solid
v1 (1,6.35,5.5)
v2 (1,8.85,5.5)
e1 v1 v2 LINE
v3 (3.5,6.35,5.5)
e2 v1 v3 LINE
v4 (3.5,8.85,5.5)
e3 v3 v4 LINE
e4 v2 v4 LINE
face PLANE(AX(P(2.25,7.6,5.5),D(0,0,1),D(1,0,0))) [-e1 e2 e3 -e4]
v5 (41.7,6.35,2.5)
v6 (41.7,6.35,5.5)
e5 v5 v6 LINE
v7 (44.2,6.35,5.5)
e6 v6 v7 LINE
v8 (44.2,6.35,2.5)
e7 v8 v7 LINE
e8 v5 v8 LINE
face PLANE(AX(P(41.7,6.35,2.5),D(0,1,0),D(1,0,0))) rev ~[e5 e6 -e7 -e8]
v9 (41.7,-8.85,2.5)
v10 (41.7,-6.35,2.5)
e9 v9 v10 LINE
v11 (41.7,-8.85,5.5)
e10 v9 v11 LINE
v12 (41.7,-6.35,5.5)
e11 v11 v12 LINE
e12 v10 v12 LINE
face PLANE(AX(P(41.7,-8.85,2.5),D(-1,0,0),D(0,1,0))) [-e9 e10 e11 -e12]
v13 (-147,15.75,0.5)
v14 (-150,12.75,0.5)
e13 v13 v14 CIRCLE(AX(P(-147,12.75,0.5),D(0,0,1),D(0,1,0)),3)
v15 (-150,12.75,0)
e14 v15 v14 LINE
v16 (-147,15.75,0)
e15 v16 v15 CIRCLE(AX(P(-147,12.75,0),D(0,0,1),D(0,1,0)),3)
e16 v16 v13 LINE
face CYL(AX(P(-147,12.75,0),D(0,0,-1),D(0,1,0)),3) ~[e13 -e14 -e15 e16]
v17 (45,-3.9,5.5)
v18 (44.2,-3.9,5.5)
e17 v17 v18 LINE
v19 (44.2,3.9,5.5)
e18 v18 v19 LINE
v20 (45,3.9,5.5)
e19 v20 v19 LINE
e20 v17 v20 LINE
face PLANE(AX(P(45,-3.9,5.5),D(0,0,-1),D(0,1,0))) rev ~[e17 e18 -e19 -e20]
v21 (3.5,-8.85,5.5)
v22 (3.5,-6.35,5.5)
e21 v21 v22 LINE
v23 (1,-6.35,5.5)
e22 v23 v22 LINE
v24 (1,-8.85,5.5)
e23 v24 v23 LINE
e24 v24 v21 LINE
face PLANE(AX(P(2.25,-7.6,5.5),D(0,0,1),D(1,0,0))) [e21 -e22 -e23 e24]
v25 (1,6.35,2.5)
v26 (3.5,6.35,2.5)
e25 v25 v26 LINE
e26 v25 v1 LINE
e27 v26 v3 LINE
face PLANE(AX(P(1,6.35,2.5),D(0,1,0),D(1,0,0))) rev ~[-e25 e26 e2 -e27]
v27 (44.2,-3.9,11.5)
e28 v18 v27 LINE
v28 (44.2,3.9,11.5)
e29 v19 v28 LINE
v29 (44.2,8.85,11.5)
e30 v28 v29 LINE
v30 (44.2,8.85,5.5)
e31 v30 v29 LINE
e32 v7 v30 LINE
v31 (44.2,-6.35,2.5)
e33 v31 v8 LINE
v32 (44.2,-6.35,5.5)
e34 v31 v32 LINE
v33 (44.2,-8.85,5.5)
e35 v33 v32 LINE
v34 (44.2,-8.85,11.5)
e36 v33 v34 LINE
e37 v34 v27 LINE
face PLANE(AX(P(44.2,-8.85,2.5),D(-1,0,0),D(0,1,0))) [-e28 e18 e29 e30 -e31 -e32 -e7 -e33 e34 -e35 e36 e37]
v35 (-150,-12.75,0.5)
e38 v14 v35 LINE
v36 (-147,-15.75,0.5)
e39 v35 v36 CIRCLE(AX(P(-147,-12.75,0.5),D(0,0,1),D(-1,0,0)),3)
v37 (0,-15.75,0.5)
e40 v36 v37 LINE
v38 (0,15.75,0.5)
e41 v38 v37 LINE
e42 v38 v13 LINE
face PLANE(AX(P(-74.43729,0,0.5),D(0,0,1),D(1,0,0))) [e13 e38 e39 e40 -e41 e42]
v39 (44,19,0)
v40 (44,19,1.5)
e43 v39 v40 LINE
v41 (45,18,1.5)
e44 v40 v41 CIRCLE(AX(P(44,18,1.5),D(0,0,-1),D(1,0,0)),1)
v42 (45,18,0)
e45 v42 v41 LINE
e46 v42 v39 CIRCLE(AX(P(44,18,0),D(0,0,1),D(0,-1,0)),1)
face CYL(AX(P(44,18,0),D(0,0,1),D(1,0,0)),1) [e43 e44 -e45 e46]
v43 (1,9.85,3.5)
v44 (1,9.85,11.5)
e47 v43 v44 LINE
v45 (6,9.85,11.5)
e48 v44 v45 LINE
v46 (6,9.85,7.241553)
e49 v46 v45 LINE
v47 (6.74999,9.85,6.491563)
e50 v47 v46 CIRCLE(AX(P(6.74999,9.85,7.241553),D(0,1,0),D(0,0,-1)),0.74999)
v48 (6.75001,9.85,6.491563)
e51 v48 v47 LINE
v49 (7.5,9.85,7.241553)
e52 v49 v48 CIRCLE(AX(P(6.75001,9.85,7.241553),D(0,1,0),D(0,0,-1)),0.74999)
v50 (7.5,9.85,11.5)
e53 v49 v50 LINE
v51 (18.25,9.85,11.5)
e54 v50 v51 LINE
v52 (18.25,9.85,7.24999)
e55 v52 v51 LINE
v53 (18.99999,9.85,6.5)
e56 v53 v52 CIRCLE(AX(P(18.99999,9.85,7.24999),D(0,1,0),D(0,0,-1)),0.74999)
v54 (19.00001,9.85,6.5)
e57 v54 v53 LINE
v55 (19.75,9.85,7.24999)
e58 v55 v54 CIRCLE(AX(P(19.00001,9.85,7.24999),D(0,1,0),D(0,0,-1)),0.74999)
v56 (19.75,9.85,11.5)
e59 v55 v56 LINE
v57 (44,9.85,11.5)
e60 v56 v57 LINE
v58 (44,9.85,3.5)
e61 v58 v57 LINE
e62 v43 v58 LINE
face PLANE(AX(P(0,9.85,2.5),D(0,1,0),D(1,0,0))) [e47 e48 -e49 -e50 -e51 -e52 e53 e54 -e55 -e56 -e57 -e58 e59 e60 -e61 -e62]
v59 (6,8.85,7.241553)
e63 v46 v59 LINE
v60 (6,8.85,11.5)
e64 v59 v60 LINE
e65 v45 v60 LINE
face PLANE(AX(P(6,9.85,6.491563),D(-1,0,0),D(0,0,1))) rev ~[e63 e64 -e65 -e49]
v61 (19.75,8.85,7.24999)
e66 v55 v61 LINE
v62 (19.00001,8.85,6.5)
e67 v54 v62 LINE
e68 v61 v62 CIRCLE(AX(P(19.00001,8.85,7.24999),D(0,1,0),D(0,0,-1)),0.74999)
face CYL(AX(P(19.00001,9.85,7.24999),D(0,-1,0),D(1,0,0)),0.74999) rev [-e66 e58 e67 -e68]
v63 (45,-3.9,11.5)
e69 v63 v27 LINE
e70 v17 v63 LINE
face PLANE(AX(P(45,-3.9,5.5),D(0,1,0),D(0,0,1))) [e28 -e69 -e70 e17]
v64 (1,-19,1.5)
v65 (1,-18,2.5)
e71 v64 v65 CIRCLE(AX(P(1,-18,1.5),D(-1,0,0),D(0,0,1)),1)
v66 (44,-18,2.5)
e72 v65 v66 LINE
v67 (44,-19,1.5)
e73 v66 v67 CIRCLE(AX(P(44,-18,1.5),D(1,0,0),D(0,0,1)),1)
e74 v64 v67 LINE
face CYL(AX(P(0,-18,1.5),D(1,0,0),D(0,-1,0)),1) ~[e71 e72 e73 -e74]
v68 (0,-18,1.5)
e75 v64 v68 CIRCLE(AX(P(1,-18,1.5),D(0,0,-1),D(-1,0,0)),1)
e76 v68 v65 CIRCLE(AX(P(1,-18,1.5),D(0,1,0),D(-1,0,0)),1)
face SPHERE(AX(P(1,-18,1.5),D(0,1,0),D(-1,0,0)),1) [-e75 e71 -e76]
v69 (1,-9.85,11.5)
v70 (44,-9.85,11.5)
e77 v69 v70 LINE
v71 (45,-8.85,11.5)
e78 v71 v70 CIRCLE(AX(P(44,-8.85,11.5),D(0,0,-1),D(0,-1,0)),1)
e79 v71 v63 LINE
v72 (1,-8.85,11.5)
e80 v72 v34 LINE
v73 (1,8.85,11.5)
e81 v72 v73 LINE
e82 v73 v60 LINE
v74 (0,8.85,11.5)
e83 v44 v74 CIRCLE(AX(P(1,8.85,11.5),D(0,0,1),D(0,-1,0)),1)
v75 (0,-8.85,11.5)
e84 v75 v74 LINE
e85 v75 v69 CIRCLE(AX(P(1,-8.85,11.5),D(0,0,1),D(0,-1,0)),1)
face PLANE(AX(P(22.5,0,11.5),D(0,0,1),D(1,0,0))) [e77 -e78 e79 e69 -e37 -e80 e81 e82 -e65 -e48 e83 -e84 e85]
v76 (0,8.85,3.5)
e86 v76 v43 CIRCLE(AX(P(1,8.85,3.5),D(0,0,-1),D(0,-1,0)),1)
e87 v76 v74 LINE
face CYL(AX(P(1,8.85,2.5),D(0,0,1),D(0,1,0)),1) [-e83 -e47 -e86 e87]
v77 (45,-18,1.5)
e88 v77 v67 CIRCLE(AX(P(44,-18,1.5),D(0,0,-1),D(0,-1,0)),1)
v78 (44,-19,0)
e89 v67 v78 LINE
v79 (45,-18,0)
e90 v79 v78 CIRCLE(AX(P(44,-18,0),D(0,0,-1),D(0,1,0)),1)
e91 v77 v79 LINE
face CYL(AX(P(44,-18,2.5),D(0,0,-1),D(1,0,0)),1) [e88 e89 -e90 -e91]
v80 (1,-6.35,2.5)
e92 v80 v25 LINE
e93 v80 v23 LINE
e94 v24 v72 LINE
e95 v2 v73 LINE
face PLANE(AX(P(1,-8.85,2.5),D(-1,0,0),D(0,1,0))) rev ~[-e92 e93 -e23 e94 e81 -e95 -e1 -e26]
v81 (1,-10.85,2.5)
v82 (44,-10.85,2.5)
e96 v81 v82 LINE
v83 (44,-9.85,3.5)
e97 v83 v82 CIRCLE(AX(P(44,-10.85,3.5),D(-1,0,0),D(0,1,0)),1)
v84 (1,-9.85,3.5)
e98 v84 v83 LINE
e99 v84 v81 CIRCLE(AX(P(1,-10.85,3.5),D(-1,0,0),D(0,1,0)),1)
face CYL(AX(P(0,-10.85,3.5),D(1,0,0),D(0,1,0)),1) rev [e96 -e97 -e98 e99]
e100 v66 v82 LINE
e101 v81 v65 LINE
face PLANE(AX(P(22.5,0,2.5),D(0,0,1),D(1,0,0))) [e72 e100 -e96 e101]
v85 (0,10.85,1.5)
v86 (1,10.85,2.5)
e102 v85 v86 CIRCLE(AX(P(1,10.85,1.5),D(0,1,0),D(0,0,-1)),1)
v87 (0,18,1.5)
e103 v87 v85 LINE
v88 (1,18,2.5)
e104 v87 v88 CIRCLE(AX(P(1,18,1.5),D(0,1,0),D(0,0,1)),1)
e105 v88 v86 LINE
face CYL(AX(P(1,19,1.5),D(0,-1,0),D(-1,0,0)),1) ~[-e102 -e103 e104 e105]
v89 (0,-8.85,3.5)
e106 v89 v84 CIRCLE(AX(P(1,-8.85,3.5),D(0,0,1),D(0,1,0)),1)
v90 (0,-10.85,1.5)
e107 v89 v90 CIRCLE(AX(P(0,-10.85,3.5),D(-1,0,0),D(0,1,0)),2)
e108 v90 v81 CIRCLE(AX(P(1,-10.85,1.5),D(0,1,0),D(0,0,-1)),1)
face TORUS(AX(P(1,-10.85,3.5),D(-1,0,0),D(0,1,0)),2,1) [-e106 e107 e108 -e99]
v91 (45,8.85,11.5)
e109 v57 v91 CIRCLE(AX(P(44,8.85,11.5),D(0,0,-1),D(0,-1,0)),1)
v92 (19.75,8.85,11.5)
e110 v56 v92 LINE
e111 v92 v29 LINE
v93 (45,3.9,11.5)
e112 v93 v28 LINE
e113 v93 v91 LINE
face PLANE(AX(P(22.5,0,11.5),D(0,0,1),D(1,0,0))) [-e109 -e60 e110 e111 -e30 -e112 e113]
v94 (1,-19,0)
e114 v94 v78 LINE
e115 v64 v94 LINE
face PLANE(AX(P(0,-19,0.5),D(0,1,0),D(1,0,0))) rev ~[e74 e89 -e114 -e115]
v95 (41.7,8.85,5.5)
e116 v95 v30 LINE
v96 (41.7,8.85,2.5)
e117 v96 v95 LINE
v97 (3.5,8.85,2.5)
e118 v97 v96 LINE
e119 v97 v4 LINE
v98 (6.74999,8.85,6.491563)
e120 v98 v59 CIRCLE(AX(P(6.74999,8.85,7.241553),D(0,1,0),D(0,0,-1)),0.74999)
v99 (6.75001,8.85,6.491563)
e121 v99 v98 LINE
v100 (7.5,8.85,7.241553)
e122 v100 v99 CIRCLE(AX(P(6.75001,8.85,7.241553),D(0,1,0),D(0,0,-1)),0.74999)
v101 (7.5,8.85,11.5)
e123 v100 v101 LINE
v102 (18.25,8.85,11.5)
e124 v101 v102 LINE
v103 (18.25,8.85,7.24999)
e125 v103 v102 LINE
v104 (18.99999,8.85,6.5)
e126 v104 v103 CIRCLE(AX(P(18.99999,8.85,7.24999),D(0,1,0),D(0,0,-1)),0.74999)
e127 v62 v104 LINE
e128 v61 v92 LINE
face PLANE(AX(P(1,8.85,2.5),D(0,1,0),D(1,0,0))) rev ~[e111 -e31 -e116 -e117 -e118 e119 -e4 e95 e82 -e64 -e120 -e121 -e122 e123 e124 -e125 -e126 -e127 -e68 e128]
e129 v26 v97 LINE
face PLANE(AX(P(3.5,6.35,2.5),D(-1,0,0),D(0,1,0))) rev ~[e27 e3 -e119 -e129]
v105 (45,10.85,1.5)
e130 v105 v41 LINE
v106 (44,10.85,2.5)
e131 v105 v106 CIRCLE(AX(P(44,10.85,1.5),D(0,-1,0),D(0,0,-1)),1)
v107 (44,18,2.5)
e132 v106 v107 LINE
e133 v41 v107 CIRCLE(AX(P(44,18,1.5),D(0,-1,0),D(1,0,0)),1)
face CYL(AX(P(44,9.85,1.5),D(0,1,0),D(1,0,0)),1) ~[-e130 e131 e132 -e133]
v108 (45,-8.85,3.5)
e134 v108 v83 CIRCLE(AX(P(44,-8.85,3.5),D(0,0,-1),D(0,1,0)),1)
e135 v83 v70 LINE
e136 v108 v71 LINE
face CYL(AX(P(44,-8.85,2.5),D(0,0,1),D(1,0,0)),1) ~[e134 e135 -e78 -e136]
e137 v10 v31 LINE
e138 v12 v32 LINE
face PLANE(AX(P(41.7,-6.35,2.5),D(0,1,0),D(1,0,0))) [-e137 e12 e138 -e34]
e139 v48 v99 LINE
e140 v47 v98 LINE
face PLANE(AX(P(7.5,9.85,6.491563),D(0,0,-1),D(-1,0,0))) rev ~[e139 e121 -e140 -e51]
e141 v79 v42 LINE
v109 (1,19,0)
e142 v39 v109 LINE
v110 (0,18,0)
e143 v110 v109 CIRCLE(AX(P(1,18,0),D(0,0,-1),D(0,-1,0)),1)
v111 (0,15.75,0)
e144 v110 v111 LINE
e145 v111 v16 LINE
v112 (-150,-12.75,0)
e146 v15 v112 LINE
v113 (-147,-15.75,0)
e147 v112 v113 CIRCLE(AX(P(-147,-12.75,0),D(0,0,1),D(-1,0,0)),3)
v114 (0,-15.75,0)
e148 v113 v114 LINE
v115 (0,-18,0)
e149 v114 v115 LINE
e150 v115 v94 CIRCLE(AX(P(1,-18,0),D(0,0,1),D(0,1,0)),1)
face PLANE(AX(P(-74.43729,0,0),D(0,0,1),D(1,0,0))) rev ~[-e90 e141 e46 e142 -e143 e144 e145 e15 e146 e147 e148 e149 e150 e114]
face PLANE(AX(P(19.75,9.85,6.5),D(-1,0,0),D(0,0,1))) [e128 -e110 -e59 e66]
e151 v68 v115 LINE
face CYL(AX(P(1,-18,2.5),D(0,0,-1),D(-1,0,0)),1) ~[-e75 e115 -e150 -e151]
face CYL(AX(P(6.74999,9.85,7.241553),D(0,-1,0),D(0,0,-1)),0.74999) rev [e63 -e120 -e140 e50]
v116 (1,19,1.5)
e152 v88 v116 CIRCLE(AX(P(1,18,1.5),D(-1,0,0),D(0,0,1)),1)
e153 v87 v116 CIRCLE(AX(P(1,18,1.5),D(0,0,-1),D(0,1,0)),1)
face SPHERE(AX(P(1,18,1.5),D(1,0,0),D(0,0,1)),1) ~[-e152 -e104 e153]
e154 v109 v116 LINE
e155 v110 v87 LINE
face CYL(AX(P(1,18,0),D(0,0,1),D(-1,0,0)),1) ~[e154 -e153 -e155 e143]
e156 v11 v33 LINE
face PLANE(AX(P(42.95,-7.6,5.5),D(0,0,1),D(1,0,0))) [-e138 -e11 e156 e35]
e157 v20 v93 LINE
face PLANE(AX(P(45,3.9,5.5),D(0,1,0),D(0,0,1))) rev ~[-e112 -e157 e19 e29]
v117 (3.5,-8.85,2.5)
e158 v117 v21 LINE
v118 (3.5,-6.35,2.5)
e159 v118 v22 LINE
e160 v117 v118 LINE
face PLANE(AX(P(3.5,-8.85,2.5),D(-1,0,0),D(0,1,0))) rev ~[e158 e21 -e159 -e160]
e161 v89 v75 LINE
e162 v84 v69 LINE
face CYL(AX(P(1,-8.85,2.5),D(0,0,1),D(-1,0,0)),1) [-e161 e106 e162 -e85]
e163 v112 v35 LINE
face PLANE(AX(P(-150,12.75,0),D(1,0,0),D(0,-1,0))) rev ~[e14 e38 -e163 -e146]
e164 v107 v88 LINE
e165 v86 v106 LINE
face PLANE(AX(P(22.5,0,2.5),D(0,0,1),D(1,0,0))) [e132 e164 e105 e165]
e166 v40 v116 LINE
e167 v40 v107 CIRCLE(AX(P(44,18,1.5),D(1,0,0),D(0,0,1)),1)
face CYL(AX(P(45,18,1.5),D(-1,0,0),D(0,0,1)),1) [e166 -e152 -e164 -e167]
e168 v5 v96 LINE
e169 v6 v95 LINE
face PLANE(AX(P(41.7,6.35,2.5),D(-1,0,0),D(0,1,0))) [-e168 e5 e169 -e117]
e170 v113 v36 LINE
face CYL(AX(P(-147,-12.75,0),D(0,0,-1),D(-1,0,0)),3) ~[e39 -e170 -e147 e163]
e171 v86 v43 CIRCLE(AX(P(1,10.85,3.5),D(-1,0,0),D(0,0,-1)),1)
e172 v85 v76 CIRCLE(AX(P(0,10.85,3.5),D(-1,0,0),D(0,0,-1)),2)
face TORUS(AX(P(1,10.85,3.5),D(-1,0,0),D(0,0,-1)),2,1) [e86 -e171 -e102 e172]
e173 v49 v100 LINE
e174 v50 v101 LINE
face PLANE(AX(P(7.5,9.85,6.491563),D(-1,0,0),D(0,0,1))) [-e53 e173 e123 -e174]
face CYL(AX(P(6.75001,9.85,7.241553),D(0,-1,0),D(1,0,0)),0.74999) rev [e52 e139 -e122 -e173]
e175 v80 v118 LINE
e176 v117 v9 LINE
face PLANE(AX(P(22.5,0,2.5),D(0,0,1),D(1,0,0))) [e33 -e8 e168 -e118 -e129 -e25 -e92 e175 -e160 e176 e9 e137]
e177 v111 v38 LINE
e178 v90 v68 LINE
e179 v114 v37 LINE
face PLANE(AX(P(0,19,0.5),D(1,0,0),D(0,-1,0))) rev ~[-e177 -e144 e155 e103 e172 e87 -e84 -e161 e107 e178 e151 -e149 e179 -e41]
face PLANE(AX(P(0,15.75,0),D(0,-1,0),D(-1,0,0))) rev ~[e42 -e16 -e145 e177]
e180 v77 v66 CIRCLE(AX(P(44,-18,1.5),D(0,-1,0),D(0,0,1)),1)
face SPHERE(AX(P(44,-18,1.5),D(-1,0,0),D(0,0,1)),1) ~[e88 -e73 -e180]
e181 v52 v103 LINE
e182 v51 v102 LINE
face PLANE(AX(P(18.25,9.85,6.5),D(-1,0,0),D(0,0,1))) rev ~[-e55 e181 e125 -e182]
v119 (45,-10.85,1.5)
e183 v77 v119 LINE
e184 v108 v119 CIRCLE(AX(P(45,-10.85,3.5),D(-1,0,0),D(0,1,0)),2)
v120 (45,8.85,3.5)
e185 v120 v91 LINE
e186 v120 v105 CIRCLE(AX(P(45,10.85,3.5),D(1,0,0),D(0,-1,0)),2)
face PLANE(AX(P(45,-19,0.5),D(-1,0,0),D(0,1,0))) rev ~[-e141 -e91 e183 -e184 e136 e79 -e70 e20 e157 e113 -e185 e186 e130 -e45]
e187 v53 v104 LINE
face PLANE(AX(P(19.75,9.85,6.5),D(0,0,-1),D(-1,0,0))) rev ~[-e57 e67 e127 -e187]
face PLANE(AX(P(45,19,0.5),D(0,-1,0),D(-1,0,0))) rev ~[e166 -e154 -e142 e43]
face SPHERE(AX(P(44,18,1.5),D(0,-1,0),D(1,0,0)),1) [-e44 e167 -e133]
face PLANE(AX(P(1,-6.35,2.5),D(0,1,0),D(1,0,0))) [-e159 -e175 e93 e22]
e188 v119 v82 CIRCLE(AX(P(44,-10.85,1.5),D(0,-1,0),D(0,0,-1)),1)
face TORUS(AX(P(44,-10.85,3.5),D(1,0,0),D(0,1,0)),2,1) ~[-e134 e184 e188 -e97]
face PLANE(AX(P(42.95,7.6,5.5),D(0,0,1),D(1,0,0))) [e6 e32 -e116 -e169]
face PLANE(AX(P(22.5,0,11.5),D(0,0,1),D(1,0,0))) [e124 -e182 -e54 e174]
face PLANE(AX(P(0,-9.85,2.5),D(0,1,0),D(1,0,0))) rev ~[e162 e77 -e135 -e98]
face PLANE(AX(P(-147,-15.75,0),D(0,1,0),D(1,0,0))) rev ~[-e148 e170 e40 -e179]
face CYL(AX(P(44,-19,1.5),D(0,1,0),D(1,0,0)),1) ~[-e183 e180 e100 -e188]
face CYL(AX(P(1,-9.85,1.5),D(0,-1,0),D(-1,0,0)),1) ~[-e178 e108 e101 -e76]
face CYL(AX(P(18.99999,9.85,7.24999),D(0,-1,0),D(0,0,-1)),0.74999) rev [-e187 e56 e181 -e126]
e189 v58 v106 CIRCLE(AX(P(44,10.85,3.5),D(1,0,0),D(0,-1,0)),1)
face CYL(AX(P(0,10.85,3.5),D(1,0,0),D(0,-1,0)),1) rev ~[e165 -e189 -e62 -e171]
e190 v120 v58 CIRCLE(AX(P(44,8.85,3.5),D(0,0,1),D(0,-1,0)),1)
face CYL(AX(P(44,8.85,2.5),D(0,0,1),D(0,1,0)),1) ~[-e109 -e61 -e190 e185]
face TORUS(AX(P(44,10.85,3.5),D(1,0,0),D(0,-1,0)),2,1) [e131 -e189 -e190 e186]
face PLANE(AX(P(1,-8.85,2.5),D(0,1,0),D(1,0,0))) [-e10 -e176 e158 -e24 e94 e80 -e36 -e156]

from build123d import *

# Parameters (mm, degrees)
F1_DEPTH  = 0.5
F3_DEPTH  = 2
F4_W      = 45
F4_H      = 19.7
F4_W_2    = 43.2
F4_H_2    = 17.7
F5_DEPTH  = 9
F6_W      = 2.5
F6_H      = 2.5
F7_DEPTH  = 3
F8_W      = 7.8
F8_H      = 6
F9_DEPTH  = 0.8
F10_W     = 1.5
F10_H     = 5
F10_H_2   = 5.0084371828
F11_DEPTH = 1
F12_R     = 0.74999
F13_R     = 1


# Not quite as in the source:
# - a fillet or chamfer is up to 0.001 mm smaller than in the source, because OpenCascade refuses the exact size


with BuildPart() as f1:
    # F0 (on Top) → F1 (new body)
    with BuildSketch(Plane.XY):
        with BuildLine():
            Line((0, -15.75), (0, 15.75))
            Line((0, 15.75), (-147, 15.75))
            ThreePointArc((-147, 15.75), (-149.1213203436, 14.8713203436), (-150, 12.75))
            Line((-150, 12.75), (-150, -12.75))
            ThreePointArc((-150, -12.75), (-149.1213203436, -14.8713203436), (-147, -15.75))
            Line((-147, -15.75), (0, -15.75))
        make_face()
        Polygon((45, 19), (0, 19), (0, 15.75), (0, -15.75), (0, -19), (45, -19), align=None)
    extrude(amount=F1_DEPTH)

    # F2 (on face) → F3 (join)
    with BuildSketch(Plane.XY.offset(0.5)):
        Polygon((45, -19), (45, 19), (0, 19), (0, 15.75), (0, -15.75), (0, -19), align=None)
    extrude(amount=F3_DEPTH)

    # F4 (on face) → F5 (join)
    with BuildSketch(Plane.XY.offset(2.5)):
        with Locations((22.5, 0)):
            Rectangle(F4_W, F4_H)
        with Locations((22.6, 0)):
            Rectangle(F4_W_2, F4_H_2, mode=Mode.SUBTRACT)
    extrude(amount=F5_DEPTH)

    # F6 (on face) → F7 (join)
    with BuildSketch(Plane.XY.offset(2.5)):
        with Locations((2.25, 7.6)):
            Rectangle(F6_W, F6_H)
        with Locations((42.95, 7.6)):
            Rectangle(F6_W, F6_H)
        with Locations((42.95, -7.6)):
            Rectangle(F6_W, F6_H)
        with Locations((2.25, -7.6)):
            Rectangle(F6_W, F6_H)
    extrude(amount=F7_DEPTH)

    # F8 (on face) → F9 (cut, through all)
    with BuildSketch(Plane.YZ.offset(45)):
        with Locations((0, 8.5)):
            Rectangle(F8_W, F8_H)
    extrude(amount=-F9_DEPTH, mode=Mode.SUBTRACT)

    # F10 (on face) → F11 (cut, through all)
    with BuildSketch(Plane(origin=(0, 9.85, 0), x_dir=(-1, 0, 0), z_dir=(0, 1, 0))):
        with Locations((-19, 9)):
            Rectangle(F10_W, F10_H)
        with Locations((-6.75, 8.9957814086)):
            Rectangle(F10_W, F10_H_2)
    extrude(amount=-F11_DEPTH, mode=Mode.SUBTRACT)

    # F12 (radius 0.75 in the source; OpenCascade refuses exactly that, so slightly less here)
    f12_edges = [f1.edges().sort_by_distance(p)[0] for p in [
        (18.25, 9.35, 6.5),
        (19.75, 9.35, 6.5),
        (6, 9.35, 6.491563),
        (7.5, 9.35, 6.491563),
    ]]
    fillet(f12_edges, radius=F12_R)

    # F13
    f13_edges = [f1.edges().sort_by_distance(p)[0] for p in [
        (45, 9.85, 7),
        (45, 14.425, 2.5),
        (45, 19, 1.25),
        (22.5, 19, 2.5),
        (0, 14.425, 2.5),
        (0, 9.85, 7),
        (22.5, 9.85, 2.5),
        (0, -9.85, 7),
        (0, -14.425, 2.5),
        (0, -19, 1.25),
        (22.5, -19, 2.5),
        (22.5, -9.85, 2.5),
        (45, -9.85, 7),
        (45, -14.425, 2.5),
        (45, -19, 1.25),
        (0, 19, 1.25),
    ]]
    fillet(f13_edges, radius=F13_R)


solid = f1.part
